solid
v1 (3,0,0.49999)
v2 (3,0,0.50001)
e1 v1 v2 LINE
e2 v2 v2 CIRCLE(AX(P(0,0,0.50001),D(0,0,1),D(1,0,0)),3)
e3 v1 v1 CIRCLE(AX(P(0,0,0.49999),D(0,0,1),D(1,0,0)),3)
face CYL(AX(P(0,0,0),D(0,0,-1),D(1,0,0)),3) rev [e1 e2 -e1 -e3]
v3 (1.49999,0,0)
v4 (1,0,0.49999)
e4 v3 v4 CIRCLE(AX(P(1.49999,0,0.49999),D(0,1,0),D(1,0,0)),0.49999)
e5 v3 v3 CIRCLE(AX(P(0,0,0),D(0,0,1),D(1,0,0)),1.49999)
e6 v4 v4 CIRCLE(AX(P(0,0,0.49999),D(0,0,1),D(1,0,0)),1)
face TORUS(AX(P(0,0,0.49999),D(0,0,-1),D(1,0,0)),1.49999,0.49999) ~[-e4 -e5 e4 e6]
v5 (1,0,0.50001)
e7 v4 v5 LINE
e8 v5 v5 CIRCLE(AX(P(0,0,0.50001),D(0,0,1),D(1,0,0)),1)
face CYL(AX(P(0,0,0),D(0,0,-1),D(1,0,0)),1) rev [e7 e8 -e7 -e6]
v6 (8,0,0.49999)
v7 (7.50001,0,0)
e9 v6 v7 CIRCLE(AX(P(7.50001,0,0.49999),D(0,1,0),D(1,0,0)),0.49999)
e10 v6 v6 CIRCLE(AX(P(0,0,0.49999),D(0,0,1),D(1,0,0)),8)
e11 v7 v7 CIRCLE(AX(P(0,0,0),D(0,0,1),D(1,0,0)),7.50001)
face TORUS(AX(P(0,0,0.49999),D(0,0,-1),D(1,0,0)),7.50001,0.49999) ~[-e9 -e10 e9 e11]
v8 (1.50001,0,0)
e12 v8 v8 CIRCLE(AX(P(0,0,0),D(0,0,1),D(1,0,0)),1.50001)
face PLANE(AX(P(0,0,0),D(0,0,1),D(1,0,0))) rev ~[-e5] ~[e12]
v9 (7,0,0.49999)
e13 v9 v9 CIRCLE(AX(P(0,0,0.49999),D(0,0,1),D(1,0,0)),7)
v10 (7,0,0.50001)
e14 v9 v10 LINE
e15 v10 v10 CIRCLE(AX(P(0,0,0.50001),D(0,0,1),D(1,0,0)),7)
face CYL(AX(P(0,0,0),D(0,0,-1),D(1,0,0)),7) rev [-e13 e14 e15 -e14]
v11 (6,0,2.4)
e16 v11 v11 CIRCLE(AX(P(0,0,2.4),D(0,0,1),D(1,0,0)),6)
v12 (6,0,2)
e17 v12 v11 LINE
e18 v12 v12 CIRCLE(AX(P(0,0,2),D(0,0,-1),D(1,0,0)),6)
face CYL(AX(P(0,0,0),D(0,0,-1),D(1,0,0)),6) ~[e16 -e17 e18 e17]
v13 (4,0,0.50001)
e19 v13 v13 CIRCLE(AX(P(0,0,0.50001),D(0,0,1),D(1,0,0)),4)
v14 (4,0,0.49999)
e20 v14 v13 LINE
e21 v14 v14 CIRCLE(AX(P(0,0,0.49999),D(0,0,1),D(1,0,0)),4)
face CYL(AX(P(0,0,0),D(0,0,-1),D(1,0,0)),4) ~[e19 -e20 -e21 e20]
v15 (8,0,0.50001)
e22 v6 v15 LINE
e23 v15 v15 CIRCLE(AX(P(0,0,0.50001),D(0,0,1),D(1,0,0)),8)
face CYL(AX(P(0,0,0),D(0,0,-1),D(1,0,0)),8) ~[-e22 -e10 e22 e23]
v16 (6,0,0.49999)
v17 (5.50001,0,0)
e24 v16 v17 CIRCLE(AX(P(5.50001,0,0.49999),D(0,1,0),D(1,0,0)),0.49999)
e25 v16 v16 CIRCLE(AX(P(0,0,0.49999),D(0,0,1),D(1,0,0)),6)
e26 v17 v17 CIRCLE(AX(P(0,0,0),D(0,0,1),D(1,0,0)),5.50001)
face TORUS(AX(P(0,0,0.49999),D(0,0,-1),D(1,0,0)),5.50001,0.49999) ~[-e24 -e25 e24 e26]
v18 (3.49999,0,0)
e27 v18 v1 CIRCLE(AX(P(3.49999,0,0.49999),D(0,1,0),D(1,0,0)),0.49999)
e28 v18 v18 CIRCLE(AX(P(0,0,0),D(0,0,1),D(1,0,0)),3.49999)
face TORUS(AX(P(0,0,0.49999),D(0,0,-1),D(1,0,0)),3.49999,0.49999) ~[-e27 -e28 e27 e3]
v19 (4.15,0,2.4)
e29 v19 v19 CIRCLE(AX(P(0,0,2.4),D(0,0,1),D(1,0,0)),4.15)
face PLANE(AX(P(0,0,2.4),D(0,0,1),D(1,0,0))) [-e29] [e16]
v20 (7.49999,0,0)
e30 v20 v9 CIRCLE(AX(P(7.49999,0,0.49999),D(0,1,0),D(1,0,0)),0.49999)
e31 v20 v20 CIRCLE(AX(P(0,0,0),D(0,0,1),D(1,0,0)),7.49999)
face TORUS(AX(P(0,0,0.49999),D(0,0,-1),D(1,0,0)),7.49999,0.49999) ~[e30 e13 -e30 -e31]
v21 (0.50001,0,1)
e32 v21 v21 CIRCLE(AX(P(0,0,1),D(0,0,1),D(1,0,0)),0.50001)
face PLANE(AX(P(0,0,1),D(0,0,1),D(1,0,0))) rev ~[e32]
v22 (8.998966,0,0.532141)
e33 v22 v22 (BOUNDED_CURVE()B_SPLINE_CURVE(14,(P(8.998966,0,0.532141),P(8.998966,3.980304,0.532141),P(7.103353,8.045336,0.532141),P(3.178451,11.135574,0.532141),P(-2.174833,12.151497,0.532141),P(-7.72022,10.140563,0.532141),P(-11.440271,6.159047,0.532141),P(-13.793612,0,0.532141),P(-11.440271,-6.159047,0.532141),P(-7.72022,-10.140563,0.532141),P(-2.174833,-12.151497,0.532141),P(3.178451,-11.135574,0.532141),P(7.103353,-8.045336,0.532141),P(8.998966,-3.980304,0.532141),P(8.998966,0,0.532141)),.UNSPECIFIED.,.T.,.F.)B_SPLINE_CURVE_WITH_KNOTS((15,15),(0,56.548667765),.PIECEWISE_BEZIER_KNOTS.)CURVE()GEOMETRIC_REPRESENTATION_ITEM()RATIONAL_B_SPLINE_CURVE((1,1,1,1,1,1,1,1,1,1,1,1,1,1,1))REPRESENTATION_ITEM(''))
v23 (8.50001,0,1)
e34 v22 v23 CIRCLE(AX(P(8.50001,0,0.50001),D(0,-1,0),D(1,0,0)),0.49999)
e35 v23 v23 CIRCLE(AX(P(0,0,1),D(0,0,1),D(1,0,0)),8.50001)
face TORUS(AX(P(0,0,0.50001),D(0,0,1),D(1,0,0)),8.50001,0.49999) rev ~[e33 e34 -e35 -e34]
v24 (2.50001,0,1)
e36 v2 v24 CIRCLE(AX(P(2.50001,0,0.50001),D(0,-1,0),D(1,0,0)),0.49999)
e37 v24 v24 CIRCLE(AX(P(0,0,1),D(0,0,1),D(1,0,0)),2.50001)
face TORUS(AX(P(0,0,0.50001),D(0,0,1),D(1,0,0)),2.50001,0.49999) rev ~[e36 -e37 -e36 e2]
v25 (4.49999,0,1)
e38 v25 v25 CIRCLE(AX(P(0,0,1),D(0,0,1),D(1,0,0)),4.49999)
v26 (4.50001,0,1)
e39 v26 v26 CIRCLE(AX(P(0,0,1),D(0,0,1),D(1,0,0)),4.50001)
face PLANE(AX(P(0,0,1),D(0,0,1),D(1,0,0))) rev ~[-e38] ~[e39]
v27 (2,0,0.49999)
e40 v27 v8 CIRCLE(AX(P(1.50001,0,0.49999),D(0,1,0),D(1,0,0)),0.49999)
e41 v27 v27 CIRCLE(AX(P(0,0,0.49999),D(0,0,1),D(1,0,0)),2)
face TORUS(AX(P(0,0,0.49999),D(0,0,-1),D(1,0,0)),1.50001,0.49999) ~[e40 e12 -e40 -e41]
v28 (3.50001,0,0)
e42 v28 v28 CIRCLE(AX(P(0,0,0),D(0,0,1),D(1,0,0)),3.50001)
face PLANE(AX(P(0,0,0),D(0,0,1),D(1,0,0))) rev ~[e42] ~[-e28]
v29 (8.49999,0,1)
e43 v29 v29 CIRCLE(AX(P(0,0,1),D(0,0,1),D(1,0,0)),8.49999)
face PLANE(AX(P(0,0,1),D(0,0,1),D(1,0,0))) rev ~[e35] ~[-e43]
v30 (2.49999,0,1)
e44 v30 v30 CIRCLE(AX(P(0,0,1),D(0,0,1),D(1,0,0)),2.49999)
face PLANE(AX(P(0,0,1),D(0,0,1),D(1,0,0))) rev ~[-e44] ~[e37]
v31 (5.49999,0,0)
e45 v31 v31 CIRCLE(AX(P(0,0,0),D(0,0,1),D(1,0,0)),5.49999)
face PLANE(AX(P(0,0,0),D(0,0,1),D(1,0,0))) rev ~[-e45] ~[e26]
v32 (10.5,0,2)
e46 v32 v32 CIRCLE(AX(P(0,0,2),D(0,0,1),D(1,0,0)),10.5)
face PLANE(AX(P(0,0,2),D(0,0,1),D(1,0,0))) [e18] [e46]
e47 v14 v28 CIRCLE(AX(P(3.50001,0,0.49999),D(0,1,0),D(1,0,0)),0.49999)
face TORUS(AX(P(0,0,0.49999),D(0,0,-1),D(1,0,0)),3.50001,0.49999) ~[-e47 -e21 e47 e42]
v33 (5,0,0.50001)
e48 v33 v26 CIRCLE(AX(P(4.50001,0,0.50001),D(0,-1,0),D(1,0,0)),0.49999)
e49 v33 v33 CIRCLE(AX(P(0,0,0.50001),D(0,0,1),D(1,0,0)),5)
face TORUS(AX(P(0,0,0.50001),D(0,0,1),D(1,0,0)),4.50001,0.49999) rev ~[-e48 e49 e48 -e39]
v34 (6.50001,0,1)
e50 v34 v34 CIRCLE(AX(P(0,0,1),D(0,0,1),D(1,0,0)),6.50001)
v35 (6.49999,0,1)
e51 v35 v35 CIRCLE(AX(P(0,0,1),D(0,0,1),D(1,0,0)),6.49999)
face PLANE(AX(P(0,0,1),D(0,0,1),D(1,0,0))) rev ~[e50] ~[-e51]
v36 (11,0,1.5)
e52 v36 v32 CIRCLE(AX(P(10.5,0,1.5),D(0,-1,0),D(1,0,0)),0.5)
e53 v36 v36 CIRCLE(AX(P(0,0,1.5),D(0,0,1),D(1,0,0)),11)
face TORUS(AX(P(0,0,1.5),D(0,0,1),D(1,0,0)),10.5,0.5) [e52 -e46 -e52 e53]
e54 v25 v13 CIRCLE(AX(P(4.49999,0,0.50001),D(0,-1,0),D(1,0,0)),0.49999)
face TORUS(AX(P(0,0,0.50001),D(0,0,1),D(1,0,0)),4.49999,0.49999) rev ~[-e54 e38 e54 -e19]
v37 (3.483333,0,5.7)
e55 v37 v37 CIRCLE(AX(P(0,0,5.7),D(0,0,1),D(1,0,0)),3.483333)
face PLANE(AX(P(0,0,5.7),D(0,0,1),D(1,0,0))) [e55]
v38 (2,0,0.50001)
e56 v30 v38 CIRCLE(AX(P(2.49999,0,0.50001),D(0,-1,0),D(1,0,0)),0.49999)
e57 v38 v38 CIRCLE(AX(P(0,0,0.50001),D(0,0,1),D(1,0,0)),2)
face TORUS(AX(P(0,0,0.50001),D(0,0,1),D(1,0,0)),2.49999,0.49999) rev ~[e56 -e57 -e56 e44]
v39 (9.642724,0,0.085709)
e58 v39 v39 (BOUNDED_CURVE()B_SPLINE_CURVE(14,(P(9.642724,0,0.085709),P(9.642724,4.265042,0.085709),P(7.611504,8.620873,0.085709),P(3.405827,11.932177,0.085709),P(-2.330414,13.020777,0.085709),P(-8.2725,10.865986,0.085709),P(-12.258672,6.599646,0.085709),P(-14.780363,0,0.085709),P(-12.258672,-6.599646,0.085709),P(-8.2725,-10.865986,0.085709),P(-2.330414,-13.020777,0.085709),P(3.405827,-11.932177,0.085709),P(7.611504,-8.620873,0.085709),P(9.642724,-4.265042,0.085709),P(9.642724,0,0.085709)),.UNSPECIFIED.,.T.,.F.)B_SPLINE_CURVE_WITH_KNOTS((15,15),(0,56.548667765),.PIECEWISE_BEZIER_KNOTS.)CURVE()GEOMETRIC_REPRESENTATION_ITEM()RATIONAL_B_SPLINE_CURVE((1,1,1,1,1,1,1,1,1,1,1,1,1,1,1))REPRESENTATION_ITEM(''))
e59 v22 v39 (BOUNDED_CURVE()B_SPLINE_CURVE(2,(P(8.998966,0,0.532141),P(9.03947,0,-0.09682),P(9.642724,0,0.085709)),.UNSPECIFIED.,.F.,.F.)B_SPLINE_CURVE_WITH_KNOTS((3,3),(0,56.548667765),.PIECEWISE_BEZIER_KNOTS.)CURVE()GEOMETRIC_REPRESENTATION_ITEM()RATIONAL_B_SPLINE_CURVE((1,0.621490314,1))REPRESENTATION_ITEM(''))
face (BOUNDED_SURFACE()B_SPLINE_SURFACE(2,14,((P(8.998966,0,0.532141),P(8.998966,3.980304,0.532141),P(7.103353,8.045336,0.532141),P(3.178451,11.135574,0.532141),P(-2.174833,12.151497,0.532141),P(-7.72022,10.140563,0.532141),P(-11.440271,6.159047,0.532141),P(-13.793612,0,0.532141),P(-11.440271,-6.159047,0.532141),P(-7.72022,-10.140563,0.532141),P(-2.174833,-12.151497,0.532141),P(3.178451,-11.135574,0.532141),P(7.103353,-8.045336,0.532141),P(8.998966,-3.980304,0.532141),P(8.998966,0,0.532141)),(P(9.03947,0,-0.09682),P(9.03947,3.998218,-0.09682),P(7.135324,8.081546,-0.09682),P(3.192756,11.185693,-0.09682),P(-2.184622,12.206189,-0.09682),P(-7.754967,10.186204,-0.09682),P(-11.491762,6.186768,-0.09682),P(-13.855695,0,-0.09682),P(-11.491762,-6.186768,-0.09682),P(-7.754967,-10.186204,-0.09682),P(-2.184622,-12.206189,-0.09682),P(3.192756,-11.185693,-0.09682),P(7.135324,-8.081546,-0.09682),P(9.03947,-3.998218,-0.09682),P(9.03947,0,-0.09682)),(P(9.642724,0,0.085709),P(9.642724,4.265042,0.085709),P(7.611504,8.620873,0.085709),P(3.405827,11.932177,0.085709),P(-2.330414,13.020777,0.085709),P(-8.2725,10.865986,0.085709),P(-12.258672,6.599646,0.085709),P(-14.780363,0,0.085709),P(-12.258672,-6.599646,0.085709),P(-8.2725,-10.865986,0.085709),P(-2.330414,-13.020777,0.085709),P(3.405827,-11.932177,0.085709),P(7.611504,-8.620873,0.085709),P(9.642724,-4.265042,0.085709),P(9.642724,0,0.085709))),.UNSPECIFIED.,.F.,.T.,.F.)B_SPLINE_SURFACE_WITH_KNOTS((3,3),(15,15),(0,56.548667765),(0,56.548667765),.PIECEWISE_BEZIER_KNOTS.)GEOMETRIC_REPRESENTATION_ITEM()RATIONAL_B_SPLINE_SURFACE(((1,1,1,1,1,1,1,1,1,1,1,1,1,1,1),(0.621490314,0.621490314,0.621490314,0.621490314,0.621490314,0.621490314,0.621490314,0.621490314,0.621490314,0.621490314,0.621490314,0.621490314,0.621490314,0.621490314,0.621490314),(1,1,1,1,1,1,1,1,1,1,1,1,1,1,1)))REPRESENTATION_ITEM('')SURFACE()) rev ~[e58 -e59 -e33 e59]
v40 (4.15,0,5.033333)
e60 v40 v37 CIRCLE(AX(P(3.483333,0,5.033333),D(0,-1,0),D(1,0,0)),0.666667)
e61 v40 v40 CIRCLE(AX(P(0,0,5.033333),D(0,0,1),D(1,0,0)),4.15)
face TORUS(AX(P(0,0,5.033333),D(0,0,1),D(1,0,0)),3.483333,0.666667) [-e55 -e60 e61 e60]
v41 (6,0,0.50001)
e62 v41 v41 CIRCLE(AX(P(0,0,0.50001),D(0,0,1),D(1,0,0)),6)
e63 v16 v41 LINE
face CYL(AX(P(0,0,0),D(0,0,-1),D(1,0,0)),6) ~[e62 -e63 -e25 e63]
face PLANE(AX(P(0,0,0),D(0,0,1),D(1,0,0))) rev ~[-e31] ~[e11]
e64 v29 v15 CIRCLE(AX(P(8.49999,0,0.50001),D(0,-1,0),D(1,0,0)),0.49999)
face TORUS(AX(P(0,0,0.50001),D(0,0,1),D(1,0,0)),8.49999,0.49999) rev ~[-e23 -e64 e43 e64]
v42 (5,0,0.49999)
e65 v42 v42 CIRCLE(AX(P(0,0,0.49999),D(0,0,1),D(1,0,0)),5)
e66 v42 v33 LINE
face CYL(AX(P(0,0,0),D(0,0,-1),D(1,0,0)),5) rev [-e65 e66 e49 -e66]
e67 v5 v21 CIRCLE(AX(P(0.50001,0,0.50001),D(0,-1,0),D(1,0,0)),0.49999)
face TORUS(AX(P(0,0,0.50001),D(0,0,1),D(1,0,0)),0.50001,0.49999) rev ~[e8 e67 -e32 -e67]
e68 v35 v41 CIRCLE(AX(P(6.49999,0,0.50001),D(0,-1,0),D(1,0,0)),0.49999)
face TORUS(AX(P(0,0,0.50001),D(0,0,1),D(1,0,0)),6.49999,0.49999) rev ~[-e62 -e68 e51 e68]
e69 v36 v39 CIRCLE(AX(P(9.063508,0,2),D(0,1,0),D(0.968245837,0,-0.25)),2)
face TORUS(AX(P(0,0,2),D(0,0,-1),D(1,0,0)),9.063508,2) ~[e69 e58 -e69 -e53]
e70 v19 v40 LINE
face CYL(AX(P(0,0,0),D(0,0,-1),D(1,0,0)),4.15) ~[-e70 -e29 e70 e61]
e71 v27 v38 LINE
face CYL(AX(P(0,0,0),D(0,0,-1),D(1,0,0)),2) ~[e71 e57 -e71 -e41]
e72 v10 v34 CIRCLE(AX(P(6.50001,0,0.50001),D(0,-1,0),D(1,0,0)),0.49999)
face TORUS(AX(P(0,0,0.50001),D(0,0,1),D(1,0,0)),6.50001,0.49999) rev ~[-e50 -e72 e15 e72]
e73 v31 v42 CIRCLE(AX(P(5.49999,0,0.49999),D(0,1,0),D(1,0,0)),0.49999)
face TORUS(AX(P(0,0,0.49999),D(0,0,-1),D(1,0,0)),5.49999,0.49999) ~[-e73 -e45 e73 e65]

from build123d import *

# Parameters (mm, degrees)
F0_R     = 11
F0_R_2   = 6
F0_R_3   = 4.15
F1_DEPTH = 2
F2_DEPTH = 5.7
F3_R     = 0.5
F5_DEPTH = 2.4
F6_R     = 9
F6_R_2   = 8.5
F6_R_3   = 8
F6_R_4   = 7
F6_R_5   = 6.5
F6_R_6   = 6
F6_R_7   = 5
F6_R_8   = 4.5
F6_R_9   = 4
F6_R_10  = 3
F6_R_11  = 2.5
F6_R_12  = 2
F6_R_13  = 1
F6_R_14  = 0.5
F7_DEPTH = 1
F8_R     = 0.49999
F9_R     = 0.49999
F10_R    = 0.6666666667


# Not quite as in the source:
# - a fillet or chamfer that OpenCascade refuses, or shapes differently, is made with other operations: its cross-section is extruded or revolved along the edge and cut away or added
# - a fillet or chamfer is up to 0.001 mm smaller than in the source, because OpenCascade refuses the exact size


with BuildPart() as f1:
    # F0 (on Top) → F1 (new body)
    with BuildSketch(Plane.XY):
        Circle(F0_R)
        Circle(F0_R_2, mode=Mode.SUBTRACT)
        Circle(F0_R_2)
        Circle(F0_R_3, mode=Mode.SUBTRACT)
        Circle(F0_R_3)
    extrude(amount=F1_DEPTH)

    # F0 (on Top) → F2 (join)
    with BuildSketch(Plane.XY):
        Circle(F0_R_3)
    extrude(amount=F2_DEPTH)

    # F3
    f3_edges = [f1.edges().sort_by_distance(p)[0] for p in [
        (-11, 0, 2),
    ]]
    fillet(f3_edges, radius=F3_R)

    # F4: fillet of radius 2 on 1 edges, made by hand

    # F4_s1 → F4_t2 (revolve, cut)
    with BuildSketch(Plane.XZ):
        with BuildLine():
            ThreePointArc((11, 1.5), (10.2882531983, 0.4188611699), (9.0635083269, 0))
            Line((9.0635083269, 0), (9.0635083269, -0.04))
            Line((9.0635083269, -0.04), (11, -0.04))
            Line((11, -0.04), (11.04, 0))
            ThreePointArc((11.04, 0), (11.04, 0.75), (11.0387298335, 1.49))
            Line((11.0387298335, 1.49), (11, 1.5))
        make_face()
    revolve(axis=Axis((0, 0, 0), (0, 0, 1)), mode=Mode.SUBTRACT)

    # F0 (on Top) → F5 (join)
    with BuildSketch(Plane.XY):
        Circle(F0_R_2)
        Circle(F0_R_3, mode=Mode.SUBTRACT)
    extrude(amount=F5_DEPTH)

    # F6 (on Top) → F7 (cut)
    with BuildSketch(Plane.XY):
        Circle(F6_R)
        Circle(F6_R_2, mode=Mode.SUBTRACT)
        Circle(F6_R_2)
        Circle(F6_R_3, mode=Mode.SUBTRACT)
        Circle(F6_R_4)
        Circle(F6_R_5, mode=Mode.SUBTRACT)
        Circle(F6_R_5)
        Circle(F6_R_6, mode=Mode.SUBTRACT)
        Circle(F6_R_7)
        Circle(F6_R_8, mode=Mode.SUBTRACT)
        Circle(F6_R_8)
        Circle(F6_R_9, mode=Mode.SUBTRACT)
        Circle(F6_R_10)
        Circle(F6_R_11, mode=Mode.SUBTRACT)
        Circle(F6_R_11)
        Circle(F6_R_12, mode=Mode.SUBTRACT)
        Circle(F6_R_13)
        Circle(F6_R_14, mode=Mode.SUBTRACT)
        Circle(F6_R_14)
    extrude(amount=F7_DEPTH, mode=Mode.SUBTRACT)

    # F8 (radius 0.5 in the source; OpenCascade refuses exactly that, so slightly less here)
    f8_edges = [f1.edges().sort_by_distance(p)[0] for p in [
        (-1, 0, 1),
        (-2, 0, 1),
        (-3, 0, 1),
        (-4, 0, 1),
        (-5, 0, 1),
        (-6, 0, 1),
        (-7, 0, 1),
        (-9, 0, 1),
        (-8, 0, 1),
    ]]
    fillet(f8_edges, radius=F8_R)

    # F9 (radius 0.5 in the source; OpenCascade refuses exactly that, so slightly less here)
    f9_edges = [f1.edges().sort_by_distance(p)[0] for p in [
        (-2, 0, 0),
        (-1, 0, 0),
        (-4, 0, 0),
        (-3, 0, 0),
        (-9.063508, 0, 0),
        (-9, 0, 0),
        (-8, 0, 0),
        (-7, 0, 0),
        (-6, 0, 0),
        (-5, 0, 0),
    ]]
    fillet(f9_edges, radius=F9_R)

    # F10
    f10_edges = [f1.edges().sort_by_distance(p)[0] for p in [
        (-4.15, 0, 5.7),
    ]]
    fillet(f10_edges, radius=F10_R)


solid = f1.part
